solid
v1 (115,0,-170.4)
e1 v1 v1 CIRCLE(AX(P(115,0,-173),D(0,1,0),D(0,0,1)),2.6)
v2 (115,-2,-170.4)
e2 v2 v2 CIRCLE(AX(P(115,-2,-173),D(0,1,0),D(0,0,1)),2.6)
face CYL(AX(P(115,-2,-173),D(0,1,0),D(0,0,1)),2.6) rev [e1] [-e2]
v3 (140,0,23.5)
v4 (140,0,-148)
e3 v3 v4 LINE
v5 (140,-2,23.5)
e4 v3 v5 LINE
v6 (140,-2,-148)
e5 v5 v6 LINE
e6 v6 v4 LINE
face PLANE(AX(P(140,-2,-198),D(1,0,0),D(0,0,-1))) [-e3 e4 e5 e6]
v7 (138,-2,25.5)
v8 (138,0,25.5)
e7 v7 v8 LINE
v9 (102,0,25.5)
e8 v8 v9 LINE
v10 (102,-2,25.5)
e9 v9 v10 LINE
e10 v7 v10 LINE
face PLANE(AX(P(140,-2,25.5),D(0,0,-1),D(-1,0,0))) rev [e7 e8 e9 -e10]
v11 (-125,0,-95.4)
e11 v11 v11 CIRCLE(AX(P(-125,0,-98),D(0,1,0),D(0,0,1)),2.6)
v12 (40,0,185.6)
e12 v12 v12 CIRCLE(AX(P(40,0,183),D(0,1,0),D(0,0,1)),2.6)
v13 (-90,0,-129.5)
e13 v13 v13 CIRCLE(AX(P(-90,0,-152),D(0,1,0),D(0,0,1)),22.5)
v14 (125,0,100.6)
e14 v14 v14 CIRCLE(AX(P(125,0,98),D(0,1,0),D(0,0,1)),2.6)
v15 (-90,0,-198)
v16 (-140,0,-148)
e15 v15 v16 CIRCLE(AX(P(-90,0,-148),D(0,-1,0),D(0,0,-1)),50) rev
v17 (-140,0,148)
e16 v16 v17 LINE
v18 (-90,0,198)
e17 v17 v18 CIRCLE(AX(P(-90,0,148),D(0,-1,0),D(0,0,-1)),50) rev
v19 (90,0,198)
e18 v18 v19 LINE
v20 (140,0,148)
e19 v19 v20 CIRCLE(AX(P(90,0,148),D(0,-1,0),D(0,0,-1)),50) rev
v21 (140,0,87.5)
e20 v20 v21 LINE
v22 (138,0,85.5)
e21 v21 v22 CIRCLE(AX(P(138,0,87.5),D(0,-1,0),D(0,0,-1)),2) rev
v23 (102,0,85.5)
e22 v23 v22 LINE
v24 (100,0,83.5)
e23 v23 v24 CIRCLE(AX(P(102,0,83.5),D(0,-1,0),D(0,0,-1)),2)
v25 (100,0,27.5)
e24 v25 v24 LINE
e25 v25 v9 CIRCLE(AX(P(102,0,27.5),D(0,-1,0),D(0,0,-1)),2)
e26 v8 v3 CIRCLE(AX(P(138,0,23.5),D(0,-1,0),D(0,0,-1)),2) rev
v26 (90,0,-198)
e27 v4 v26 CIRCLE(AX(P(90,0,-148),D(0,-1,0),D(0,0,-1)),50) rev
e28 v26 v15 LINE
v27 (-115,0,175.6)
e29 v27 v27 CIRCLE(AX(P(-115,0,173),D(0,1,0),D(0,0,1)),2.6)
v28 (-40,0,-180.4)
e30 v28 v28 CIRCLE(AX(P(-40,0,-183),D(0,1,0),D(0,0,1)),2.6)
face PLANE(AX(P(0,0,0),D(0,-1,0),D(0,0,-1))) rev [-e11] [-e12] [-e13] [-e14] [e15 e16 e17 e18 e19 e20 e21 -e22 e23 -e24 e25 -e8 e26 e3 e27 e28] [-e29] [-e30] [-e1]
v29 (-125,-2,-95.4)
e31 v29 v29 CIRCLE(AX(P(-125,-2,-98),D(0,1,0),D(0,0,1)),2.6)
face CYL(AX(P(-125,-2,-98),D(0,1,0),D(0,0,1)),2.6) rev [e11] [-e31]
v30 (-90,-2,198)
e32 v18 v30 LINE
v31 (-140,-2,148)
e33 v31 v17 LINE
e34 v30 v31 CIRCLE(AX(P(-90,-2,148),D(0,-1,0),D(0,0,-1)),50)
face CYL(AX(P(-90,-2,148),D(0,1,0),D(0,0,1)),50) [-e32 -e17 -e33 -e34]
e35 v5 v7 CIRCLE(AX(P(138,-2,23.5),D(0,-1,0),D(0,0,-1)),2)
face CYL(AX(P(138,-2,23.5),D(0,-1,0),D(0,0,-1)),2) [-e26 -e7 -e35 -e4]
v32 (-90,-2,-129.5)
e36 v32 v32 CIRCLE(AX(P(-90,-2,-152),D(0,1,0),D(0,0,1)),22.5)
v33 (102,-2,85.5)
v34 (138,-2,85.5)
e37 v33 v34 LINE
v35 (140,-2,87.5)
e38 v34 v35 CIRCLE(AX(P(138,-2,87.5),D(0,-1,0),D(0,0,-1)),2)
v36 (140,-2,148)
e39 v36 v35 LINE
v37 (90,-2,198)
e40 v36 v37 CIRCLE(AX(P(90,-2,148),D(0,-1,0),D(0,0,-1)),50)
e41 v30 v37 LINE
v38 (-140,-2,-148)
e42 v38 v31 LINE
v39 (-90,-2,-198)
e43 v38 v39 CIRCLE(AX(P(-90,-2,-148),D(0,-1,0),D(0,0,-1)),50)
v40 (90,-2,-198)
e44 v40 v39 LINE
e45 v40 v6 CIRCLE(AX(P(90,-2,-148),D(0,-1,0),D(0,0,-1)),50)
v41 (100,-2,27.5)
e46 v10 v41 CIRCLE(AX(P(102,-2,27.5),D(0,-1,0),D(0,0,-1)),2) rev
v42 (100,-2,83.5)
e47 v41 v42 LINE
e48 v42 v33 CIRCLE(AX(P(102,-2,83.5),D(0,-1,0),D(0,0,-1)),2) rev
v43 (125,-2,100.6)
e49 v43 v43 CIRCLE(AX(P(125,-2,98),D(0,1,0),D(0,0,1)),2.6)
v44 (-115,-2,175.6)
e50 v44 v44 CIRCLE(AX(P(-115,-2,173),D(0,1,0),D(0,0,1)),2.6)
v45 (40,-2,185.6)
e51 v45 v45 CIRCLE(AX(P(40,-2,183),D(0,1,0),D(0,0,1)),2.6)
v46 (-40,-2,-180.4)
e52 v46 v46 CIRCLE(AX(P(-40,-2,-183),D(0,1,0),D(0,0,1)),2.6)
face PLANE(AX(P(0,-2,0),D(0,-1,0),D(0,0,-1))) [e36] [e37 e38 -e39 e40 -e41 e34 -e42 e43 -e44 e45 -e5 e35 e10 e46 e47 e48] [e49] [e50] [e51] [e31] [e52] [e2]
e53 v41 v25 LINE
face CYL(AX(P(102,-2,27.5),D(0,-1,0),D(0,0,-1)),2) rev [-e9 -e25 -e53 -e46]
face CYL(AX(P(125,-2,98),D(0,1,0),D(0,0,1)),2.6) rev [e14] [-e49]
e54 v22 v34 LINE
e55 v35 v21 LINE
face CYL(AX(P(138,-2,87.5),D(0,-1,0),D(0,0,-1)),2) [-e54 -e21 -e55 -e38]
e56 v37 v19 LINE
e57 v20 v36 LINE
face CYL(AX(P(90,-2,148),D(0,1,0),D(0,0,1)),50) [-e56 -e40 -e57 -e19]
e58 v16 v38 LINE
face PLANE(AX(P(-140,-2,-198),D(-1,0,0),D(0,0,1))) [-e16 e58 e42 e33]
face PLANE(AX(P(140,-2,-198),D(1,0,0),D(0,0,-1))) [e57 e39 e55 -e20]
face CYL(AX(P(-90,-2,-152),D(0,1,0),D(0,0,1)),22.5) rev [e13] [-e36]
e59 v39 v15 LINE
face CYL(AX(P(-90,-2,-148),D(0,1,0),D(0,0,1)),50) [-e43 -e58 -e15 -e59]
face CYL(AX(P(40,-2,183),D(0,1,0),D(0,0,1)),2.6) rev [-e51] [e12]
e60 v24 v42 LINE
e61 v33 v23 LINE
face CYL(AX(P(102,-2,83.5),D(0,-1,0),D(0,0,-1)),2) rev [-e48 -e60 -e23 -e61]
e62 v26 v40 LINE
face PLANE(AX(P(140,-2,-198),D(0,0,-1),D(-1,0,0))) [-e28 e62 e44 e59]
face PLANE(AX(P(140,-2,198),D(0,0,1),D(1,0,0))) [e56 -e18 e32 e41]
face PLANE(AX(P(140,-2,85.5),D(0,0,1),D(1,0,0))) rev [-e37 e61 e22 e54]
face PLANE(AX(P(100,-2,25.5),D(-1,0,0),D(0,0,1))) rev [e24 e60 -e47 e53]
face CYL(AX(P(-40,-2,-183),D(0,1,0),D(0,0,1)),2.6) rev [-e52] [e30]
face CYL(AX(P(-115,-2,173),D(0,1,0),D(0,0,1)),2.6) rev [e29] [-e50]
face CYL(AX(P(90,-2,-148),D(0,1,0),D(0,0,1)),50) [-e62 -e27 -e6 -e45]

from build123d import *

# Parameters (mm, degrees)
SKETCH1_W             = 280
SKETCH1_H             = 396
BASE_FLANGE1_DEPTH    = 2
BREAK_CORNER1_START   = -2
BREAK_CORNER1_DEPTH   = 2
SKETCH2_R             = 22.5
CUT_EXTRUDE1_DEPTH    = 243.503608221
SKETCH3_R             = 2.6
CUT_EXTRUDE2_DEPTH    = 243.503608221
SKETCH4_W             = 40
SKETCH4_H             = 60
CUT_EXTRUDE3_DEPTH    = 243.503608221
BREAK_CORNER2_START   = -2
BREAK_CORNER2_DEPTH   = 2
BREAK_CORNER2_2_DEPTH = 2


# Read off the part's stored shape, not the designer's step: Break-Corner1, Break-Corner2
# Sheet-metal steps are written as plain solids
with BuildPart() as part:
    # Sketch1 → Base-Flange1 (new body)
    with BuildSketch(Plane(origin=(0, 0, 0), x_dir=(1, 0, 0), z_dir=(0, 1, 0))):
        Rectangle(SKETCH1_W, SKETCH1_H)
    extrude(amount=-BASE_FLANGE1_DEPTH)

    # Break-Corner1 outline → Break-Corner1 (cut)
    with BuildSketch(Plane(origin=(0, 0, 0), x_dir=(1, 0, 0), z_dir=(0, 1, 0)).offset(BREAK_CORNER1_START)):
        with BuildLine():
            ThreePointArc((-140, 148), (-125.355339059, 183.355339059), (-90, 198))
            Line((-90, 198), (-140, 198))
            Line((-140, 198), (-140, 148))
        make_face()
        with BuildLine():
            Line((140, 198), (90, 198))
            ThreePointArc((90, 198), (125.355339059, 183.355339059), (140, 148))
            Line((140, 148), (140, 198))
        make_face()
        with BuildLine():
            ThreePointArc((-90, -198), (-125.355339059, -183.355339059), (-140, -148))
            Line((-140, -148), (-140, -198))
            Line((-140, -198), (-90, -198))
        make_face()
        with BuildLine():
            Line((140, -198), (140, -148))
            ThreePointArc((140, -148), (125.355339059, -183.355339059), (90, -198))
            Line((90, -198), (140, -198))
        make_face()
    extrude(amount=BREAK_CORNER1_DEPTH, mode=Mode.SUBTRACT)

    # Sketch2 → Cut-Extrude1 (cut, through all)
    with BuildSketch(Plane(origin=(0, 0, 0), x_dir=(1, 0, 0), z_dir=(0, 1, 0))):
        with Locations(Location((-90, 152, 0), (0, 0, 270))):
            Circle(SKETCH2_R)
    extrude(amount=-CUT_EXTRUDE1_DEPTH, mode=Mode.SUBTRACT)

    # Sketch3 → Cut-Extrude2 (cut, through all)
    with BuildSketch(Plane(origin=(0, 0, 0), x_dir=(1, 0, 0), z_dir=(0, 1, 0))):
        with Locations(Location((-40, 183, 0), (0, 0, 270))):
            Circle(SKETCH3_R)
        with Locations(Location((-125, 98, 0), (0, 0, 270))):
            Circle(SKETCH3_R)
        with Locations(Location((125, -98, 0), (0, 0, 270))):
            Circle(SKETCH3_R)
        with Locations(Location((40, -183, 0), (0, 0, 270))):
            Circle(SKETCH3_R)
        with Locations(Location((-115, -173, 0), (0, 0, 270))):
            Circle(SKETCH3_R)
        with Locations(Location((115, 173, 0), (0, 0, 270))):
            Circle(SKETCH3_R)
    extrude(amount=-CUT_EXTRUDE2_DEPTH, mode=Mode.SUBTRACT)

    # Sketch4 → Cut-Extrude3 (cut, through all)
    with BuildSketch(Plane(origin=(0, 0, 0), x_dir=(1, 0, 0), z_dir=(0, 1, 0))):
        with Locations((120, -55.5)):
            Rectangle(SKETCH4_W, SKETCH4_H)
    extrude(amount=-CUT_EXTRUDE3_DEPTH, mode=Mode.SUBTRACT)

    # Break-Corner2 outline → Break-Corner2 (cut)
    with BuildSketch(Plane(origin=(0, 0, 0), x_dir=(1, 0, 0), z_dir=(0, 1, 0)).offset(BREAK_CORNER2_START)):
        with BuildLine():
            Line((140, -85.5), (138, -85.5))
            ThreePointArc((138, -85.5), (139.414213562, -86.085786438), (140, -87.5))
            Line((140, -87.5), (140, -85.5))
        make_face()
        with BuildLine():
            ThreePointArc((140, -23.5), (139.414213562, -24.914213562), (138, -25.5))
            Line((138, -25.5), (140, -25.5))
            Line((140, -25.5), (140, -23.5))
        make_face()
    extrude(amount=BREAK_CORNER2_DEPTH, mode=Mode.SUBTRACT)

    # Break-Corner2 2 outline → Break-Corner2 2 (add)
    with BuildSketch(Plane(origin=(0, 0, 0), x_dir=(1, 0, 0), z_dir=(0, 1, 0)).offset(BREAK_CORNER2_START)):
        with BuildLine():
            Line((100, -25.5), (100, -27.5))
            ThreePointArc((100, -27.5), (100.585786438, -26.085786438), (102, -25.5))
            Line((102, -25.5), (100, -25.5))
        make_face()
        with BuildLine():
            ThreePointArc((102, -85.5), (100.585786438, -84.914213562), (100, -83.5))
            Line((100, -83.5), (100, -85.5))
            Line((100, -85.5), (102, -85.5))
        make_face()
    extrude(amount=BREAK_CORNER2_2_DEPTH)


solid = part.part
